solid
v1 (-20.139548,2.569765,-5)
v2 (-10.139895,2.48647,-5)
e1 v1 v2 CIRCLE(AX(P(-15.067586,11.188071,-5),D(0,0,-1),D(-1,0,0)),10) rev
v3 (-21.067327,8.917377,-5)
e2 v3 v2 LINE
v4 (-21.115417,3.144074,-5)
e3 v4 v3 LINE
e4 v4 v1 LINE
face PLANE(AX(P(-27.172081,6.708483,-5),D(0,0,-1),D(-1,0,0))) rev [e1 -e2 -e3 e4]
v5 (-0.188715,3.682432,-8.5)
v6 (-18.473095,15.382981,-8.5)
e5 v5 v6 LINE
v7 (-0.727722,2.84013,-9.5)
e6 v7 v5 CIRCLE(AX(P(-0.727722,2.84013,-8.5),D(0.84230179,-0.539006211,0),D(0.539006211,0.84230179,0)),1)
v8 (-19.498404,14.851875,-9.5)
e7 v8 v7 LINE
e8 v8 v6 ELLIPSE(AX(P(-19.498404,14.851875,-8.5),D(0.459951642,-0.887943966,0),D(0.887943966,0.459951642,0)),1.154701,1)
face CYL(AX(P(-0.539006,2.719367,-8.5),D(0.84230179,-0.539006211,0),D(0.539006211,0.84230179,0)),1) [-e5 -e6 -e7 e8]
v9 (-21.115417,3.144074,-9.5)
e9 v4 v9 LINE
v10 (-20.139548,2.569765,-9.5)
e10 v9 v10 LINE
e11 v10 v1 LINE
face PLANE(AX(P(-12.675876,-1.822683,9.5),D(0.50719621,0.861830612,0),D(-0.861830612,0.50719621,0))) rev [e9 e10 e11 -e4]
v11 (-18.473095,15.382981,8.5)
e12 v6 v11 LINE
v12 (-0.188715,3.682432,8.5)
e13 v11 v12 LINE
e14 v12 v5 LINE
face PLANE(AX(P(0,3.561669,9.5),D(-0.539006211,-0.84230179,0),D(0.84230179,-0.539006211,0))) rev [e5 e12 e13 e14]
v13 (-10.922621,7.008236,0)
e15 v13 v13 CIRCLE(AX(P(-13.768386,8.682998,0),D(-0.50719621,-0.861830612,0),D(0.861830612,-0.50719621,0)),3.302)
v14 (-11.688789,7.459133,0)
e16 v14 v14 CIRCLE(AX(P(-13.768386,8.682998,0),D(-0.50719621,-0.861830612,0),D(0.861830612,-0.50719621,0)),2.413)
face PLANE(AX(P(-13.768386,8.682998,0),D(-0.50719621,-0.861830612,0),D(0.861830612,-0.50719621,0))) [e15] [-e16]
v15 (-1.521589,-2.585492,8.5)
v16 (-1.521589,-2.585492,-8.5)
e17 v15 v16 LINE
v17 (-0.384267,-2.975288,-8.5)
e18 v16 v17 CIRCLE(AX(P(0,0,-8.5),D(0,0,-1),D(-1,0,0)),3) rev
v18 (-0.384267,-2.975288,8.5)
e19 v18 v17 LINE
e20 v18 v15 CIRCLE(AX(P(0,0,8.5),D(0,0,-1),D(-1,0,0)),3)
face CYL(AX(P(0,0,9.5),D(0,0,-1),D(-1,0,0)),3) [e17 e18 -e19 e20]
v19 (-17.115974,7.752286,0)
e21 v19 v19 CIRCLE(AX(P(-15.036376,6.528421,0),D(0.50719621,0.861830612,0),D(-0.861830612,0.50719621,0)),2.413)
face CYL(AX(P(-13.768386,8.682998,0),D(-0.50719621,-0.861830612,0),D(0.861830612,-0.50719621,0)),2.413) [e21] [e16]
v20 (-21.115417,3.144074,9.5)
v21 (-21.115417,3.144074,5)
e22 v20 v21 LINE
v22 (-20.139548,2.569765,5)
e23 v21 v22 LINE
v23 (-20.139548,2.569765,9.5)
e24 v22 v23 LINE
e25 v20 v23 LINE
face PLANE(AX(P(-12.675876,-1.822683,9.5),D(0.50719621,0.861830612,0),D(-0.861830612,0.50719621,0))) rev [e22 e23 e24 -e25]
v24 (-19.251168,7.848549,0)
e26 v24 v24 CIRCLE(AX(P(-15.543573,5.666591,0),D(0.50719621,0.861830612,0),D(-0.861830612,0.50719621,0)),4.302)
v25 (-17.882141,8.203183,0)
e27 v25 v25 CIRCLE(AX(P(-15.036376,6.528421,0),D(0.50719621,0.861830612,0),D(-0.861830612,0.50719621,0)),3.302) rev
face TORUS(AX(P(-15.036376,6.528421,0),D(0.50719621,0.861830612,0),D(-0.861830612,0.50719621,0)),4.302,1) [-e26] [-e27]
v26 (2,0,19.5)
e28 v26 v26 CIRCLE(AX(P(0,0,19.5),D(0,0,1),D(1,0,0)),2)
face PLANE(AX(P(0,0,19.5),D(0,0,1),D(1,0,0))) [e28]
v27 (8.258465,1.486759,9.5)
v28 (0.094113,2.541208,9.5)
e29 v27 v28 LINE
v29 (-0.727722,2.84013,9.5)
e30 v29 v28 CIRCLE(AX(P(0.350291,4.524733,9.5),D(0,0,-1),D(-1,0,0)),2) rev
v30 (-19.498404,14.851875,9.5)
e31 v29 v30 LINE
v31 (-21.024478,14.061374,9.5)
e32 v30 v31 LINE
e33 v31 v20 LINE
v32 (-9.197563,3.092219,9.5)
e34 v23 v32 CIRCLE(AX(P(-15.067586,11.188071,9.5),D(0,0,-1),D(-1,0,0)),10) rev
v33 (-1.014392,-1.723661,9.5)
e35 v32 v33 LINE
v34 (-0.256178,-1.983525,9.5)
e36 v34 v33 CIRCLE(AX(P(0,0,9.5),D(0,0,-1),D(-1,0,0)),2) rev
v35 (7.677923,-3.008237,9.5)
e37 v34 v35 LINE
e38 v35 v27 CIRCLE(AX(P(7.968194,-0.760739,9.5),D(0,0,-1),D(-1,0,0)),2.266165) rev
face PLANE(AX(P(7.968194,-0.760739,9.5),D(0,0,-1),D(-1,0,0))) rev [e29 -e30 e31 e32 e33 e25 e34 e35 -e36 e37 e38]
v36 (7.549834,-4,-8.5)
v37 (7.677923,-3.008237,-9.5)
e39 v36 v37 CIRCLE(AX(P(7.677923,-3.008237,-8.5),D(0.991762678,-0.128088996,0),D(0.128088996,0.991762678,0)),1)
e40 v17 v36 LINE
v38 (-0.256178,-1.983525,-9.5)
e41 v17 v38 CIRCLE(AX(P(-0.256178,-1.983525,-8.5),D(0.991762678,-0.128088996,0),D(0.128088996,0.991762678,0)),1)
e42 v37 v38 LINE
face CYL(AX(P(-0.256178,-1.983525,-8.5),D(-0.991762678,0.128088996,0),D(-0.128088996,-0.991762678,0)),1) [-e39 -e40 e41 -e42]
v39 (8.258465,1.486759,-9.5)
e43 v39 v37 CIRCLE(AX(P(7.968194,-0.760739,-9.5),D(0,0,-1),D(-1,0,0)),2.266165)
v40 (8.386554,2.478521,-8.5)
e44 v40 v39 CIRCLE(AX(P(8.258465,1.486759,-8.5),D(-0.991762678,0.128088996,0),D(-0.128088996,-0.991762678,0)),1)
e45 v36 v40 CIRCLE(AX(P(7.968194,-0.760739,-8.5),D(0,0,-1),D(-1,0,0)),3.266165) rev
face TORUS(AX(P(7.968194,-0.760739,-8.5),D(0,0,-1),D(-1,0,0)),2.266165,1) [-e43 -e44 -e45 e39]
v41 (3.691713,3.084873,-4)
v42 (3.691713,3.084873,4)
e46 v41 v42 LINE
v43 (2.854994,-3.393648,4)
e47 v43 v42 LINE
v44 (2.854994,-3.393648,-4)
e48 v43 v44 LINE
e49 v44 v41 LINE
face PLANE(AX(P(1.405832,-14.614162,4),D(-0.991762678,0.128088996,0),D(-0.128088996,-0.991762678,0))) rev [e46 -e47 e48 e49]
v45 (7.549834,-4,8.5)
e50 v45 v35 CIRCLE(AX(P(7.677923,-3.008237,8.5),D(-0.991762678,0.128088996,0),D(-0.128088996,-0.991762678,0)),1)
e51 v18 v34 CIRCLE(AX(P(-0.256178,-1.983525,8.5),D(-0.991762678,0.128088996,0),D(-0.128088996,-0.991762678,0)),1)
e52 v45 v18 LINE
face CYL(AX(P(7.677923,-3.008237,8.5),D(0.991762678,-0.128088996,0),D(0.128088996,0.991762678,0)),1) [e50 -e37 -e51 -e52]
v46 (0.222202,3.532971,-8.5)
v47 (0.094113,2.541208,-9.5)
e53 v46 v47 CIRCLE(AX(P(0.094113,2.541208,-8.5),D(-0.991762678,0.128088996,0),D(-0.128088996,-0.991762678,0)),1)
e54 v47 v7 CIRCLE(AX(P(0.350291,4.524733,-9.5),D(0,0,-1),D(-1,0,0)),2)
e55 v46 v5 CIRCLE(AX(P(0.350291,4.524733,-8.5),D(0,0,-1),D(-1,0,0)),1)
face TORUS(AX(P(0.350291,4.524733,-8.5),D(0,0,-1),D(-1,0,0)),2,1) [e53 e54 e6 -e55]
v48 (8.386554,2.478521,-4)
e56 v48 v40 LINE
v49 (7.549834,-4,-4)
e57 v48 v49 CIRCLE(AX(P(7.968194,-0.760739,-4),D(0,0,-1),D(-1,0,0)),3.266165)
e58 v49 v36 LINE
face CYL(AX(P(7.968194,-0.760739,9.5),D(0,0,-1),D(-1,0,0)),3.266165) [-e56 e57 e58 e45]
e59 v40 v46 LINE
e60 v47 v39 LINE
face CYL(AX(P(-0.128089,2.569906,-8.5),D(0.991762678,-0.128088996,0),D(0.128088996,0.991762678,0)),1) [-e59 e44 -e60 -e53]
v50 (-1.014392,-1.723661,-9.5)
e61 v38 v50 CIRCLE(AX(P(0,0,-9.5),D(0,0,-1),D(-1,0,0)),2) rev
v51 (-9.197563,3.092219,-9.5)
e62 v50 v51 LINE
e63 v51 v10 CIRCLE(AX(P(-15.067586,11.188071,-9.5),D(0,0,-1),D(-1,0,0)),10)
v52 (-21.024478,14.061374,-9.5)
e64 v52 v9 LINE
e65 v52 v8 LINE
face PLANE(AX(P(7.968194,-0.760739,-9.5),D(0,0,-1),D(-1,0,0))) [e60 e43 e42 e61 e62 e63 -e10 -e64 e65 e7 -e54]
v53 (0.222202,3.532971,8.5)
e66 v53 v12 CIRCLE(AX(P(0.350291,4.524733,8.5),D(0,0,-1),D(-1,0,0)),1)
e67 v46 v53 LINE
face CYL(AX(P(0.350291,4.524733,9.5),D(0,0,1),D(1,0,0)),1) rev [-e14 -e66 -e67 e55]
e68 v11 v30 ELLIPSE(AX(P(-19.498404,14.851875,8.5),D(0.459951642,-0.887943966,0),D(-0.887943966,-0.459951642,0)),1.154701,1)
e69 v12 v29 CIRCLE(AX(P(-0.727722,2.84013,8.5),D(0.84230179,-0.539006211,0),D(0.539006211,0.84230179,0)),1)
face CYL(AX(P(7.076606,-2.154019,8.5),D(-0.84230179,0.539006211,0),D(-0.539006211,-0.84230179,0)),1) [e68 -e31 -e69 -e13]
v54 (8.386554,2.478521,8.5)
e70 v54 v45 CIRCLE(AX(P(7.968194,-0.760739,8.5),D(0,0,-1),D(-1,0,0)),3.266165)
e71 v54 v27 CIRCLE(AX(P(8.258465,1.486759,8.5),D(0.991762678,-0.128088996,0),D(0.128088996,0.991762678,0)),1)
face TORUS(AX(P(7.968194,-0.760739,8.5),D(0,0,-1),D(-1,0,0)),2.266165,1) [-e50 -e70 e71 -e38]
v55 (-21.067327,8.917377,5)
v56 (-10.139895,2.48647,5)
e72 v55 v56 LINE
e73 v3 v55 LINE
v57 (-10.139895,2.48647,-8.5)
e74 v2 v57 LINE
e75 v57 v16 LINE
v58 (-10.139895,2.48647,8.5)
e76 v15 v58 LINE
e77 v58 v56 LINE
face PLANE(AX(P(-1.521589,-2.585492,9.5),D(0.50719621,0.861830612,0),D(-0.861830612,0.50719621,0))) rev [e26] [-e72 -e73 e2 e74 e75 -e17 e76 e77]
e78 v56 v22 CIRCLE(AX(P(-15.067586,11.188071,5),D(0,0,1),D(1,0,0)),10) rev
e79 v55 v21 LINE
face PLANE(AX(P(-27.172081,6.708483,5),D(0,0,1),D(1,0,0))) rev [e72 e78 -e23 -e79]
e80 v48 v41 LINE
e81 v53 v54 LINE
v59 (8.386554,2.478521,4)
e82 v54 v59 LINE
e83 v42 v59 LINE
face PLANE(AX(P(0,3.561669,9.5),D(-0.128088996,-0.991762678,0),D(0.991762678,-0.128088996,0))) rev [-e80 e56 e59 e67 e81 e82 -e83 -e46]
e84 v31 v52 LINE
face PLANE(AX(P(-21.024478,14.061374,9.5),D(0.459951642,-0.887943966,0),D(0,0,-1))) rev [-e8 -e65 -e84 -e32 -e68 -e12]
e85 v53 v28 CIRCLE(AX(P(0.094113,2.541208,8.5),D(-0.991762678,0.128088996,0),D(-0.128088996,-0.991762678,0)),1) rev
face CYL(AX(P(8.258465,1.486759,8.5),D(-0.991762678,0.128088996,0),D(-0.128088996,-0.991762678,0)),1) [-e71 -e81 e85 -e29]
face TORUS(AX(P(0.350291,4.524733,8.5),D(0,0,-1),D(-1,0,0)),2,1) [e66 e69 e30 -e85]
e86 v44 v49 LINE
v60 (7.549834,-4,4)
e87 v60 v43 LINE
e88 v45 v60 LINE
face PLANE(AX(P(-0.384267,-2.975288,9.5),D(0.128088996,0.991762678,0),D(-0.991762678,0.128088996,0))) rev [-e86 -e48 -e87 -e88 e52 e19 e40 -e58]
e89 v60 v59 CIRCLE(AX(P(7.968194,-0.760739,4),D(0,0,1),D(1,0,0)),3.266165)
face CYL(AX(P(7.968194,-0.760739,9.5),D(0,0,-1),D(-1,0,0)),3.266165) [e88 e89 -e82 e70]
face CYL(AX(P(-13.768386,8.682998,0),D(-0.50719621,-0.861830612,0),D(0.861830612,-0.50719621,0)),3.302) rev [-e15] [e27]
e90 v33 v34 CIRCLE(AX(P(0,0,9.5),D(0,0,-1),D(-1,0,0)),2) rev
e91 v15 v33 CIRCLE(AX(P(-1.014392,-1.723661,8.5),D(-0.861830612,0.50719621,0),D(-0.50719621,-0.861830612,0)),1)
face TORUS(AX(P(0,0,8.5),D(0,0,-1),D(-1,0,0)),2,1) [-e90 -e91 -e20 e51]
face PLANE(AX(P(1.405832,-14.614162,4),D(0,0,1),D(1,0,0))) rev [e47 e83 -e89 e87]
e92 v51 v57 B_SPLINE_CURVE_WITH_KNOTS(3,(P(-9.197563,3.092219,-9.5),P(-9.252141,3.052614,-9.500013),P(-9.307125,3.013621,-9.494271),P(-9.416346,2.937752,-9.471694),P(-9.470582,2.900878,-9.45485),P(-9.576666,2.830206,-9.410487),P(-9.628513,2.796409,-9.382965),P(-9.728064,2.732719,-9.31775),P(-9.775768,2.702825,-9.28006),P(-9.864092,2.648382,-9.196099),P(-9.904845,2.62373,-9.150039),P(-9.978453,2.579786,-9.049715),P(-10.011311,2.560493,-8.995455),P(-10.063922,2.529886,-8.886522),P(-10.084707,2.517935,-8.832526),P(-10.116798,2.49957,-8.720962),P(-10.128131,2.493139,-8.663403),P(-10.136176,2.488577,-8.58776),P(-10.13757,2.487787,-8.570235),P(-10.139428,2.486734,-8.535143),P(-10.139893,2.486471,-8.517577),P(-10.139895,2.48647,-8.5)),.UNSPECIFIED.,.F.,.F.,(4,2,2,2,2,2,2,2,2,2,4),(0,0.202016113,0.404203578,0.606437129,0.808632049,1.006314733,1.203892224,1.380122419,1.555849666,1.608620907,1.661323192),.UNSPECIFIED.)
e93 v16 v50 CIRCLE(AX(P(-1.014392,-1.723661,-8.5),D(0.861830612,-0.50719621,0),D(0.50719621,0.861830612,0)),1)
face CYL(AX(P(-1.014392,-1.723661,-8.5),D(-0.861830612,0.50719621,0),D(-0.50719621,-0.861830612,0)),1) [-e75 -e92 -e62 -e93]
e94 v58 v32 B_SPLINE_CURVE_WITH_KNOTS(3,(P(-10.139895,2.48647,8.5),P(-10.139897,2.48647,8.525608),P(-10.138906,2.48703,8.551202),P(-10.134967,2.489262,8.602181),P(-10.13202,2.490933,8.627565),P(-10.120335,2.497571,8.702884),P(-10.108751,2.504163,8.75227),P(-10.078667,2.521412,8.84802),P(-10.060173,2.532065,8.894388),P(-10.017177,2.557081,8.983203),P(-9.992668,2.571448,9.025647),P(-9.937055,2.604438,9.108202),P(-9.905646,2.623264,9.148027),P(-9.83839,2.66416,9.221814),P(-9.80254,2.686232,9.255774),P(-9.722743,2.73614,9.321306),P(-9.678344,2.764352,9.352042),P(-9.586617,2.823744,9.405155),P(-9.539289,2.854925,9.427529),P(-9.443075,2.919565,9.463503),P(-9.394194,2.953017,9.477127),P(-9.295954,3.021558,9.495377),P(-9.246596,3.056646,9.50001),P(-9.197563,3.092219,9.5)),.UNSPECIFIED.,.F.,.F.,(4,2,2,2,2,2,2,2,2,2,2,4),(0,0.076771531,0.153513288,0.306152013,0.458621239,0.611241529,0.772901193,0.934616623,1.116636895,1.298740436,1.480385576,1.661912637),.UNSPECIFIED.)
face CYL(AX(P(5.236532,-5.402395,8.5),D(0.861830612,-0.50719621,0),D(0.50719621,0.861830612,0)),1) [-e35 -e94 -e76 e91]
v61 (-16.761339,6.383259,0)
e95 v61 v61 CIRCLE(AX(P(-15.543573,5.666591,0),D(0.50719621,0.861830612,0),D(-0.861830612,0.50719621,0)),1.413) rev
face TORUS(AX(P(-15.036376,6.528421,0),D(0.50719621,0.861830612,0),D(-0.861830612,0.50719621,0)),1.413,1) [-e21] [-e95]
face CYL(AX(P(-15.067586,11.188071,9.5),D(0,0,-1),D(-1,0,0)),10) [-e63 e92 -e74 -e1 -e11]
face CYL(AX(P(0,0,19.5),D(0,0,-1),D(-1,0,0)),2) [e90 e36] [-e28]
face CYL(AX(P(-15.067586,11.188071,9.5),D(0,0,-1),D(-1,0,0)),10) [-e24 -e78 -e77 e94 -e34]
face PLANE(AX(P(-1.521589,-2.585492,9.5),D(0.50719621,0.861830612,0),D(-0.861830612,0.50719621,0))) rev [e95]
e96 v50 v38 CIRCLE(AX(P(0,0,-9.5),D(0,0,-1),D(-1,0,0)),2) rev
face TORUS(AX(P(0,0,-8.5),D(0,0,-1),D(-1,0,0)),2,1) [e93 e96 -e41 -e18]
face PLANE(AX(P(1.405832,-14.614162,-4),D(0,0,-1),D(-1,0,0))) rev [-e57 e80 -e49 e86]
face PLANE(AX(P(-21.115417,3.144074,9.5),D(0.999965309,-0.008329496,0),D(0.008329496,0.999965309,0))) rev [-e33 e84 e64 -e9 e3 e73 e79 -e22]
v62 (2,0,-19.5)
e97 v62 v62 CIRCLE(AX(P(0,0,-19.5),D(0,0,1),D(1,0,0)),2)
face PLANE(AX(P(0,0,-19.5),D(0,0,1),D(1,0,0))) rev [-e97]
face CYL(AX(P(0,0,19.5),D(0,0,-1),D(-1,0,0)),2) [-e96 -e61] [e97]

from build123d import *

# Parameters (mm, degrees)
BOSS_EXTRUDE1_DEPTH = 9.5
SKETCH2_R           = 2
BOSS_EXTRUDE2_DEPTH = 19.5
SKETCH7_W           = 10
SKETCH7_H           = 5
CUT_EXTRUDE3_DEPTH  = 31.276334221
SKETCH5_R           = 3.302
SKETCH5_R_2         = 2.413
CUT_EXTRUDE2_DEPTH  = 3.5
FILLET3_R           = 10
FILLET1_R           = 1
FILLET2_R           = 1
SKETCH9_W           = 8
SKETCH9_H           = 8
CUT_EXTRUDE5_DEPTH  = 6.532330181
CHAMFER1_SIZE       = 3
CHAMFER1_SIZE_2     = 2.938727652


# Some blends are built 0.0001 mm under size
with BuildPart() as part:
    # Sketch1 → Boss-Extrude1 (new, symmetric)
    with BuildSketch(Plane.XY):
        with BuildLine():
            Line((0, 3.561668795), (-21, 17))
            Line((-21, 17), (-21.115416888, 3.14407423))
            Line((-21.115416888, 3.14407423), (-12.675875805, -1.822682799))
            Line((-12.675875805, -1.822682799), (-10.139894754, 2.486470263))
            Line((-10.139894754, 2.486470263), (-1.52158863, -2.585491837))
            ThreePointArc((-1.52158863, -2.585491837), (-0.972654449, -2.837947026), (-0.384266987, -2.975288034))
            Line((-0.384266987, -2.975288034), (7.549834435, -4))
            ThreePointArc((7.549834435, -4), (11.207454879, -1.17909917), (8.386554049, 2.478521273))
            Line((8.386554049, 2.478521273), (0, 3.561668795))
        make_face()
    extrude(amount=BOSS_EXTRUDE1_DEPTH, both=True)

    # Sketch2 → Boss-Extrude2 (add, symmetric)
    with BuildSketch(Plane.XY):
        with Locations(Location((0, 0, 0), (0, 0, 180))):
            Circle(SKETCH2_R)
    extrude(amount=BOSS_EXTRUDE2_DEPTH, both=True)

    # Sketch7 → Cut-Extrude3 (cut, through all)
    with BuildSketch(Plane(origin=(-8.618306124, 5.071962101, 0), x_dir=(0, 0, -1), z_dir=(0.8618306124209184, -0.5071962100550289, 0))):
        with Locations((0, -5.5)):
            Rectangle(SKETCH7_W, SKETCH7_H)
    extrude(amount=-CUT_EXTRUDE3_DEPTH, mode=Mode.SUBTRACT)

    # Sketch5 → Cut-Extrude2 (cut)
    with BuildSketch(Plane(origin=(-1.52158863, -2.585491837, 0), x_dir=(0.8618306124209184, -0.5071962100550289, 0), z_dir=(-0.5071962100550289, -0.8618306124209184, 0))):
        with Locations((-16.27, 0)):
            Circle(SKETCH5_R)
        with Locations((-16.27, 0)):
            Circle(SKETCH5_R_2, mode=Mode.SUBTRACT)
    extrude(amount=-CUT_EXTRUDE2_DEPTH, mode=Mode.SUBTRACT)

    # Fillet3
    # the kernel refuses this fillet: 10 mm, written as the material it takes off along each edge
    with BuildSketch(Plane(origin=(-12.675875805, -1.822682799, -31.150635095), x_dir=(-0.8618306124209182, 0.507196210055029, 0), z_dir=(0, 0, 1)), Plane(origin=(-12.675875805, -1.822682799, -16.650635095), x_dir=(-0.8618306124209182, 0.507196210055029, 0), z_dir=(0, 0, 1))) as fillet3_piece_1:
        with BuildLine():
            CenterArc((8.660254038, -10), FILLET3_R, 90, 60)
            Line((0, -5), (0, 0))
            Line((0, 0), (8.660254038, 0))
        make_face()
    extrude(amount=47.801270189, mode=Mode.SUBTRACT)

    # Fillet1
    fillet1_edges = [part.edges().sort_by_distance(p)[0] for p in [
        (-18.389337376, 7.341352386, 0),
        (-17.623169962, 6.890454955, 0),
    ]]
    fillet(fillet1_edges, radius=FILLET1_R)

    # Fillet2
    fillet2_edges = [part.edges().sort_by_distance(p)[0] for p in [
        (-0.972654449, -2.837947026, -9.5),
        (-5.830741692, -0.049510787, -9.5),
        (-10.5, 10.280834397, -9.5),
        (4.193277024, 3.020095034, -9.5),
        (0, 3.561668795, 0),
        (-5.830741692, -0.049510787, 9.5),
        (-0.972654449, -2.837947026, 9.5),
        (3.582783724, -3.487644017, 9.5),
        (11.207454879, -1.17909917, 9.5),
        (4.193277024, 3.020095034, 9.5),
        (-10.5, 10.280834397, 9.5),
        (11.207454879, -1.17909917, -9.5),
        (3.582783724, -3.487644017, -9.5),
    ]]
    fillet(fillet2_edges, radius=FILLET2_R - 0.0001)  # a hair under: the kernel refuses the full size

    # Sketch9 → Cut-Extrude5 (cut)
    with BuildSketch(Plane(origin=(0.452452626, 3.50323324, 0), x_dir=(0.9917626778378904, -0.12808899581079106, 0), z_dir=(0.12808899581079106, 0.9917626778378904, 0))):
        with Locations((7.266165091, 0)):
            Rectangle(SKETCH9_W, SKETCH9_H)
    extrude(amount=-CUT_EXTRUDE5_DEPTH, mode=Mode.SUBTRACT)

    # Chamfer1
    # the kernel refuses this chamfer: 5.196152423, 3.337326817, 3, 2.938727652 mm, written as the material it takes off along each edge
    with BuildSketch(Plane(origin=(-21, 17, -16.154510493), x_dir=(0.8423017896549276, -0.5390062106730368, 0), z_dir=(0, 0, 1))) as chamfer1_piece_1:
        Polygon((CHAMFER1_SIZE, 0), (CHAMFER1_SIZE_2 * 0.531971562398, -CHAMFER1_SIZE_2 * 0.846762219836), (0, 0), align=None)
    extrude(amount=32.309020987, mode=Mode.SUBTRACT)


solid = part.part
